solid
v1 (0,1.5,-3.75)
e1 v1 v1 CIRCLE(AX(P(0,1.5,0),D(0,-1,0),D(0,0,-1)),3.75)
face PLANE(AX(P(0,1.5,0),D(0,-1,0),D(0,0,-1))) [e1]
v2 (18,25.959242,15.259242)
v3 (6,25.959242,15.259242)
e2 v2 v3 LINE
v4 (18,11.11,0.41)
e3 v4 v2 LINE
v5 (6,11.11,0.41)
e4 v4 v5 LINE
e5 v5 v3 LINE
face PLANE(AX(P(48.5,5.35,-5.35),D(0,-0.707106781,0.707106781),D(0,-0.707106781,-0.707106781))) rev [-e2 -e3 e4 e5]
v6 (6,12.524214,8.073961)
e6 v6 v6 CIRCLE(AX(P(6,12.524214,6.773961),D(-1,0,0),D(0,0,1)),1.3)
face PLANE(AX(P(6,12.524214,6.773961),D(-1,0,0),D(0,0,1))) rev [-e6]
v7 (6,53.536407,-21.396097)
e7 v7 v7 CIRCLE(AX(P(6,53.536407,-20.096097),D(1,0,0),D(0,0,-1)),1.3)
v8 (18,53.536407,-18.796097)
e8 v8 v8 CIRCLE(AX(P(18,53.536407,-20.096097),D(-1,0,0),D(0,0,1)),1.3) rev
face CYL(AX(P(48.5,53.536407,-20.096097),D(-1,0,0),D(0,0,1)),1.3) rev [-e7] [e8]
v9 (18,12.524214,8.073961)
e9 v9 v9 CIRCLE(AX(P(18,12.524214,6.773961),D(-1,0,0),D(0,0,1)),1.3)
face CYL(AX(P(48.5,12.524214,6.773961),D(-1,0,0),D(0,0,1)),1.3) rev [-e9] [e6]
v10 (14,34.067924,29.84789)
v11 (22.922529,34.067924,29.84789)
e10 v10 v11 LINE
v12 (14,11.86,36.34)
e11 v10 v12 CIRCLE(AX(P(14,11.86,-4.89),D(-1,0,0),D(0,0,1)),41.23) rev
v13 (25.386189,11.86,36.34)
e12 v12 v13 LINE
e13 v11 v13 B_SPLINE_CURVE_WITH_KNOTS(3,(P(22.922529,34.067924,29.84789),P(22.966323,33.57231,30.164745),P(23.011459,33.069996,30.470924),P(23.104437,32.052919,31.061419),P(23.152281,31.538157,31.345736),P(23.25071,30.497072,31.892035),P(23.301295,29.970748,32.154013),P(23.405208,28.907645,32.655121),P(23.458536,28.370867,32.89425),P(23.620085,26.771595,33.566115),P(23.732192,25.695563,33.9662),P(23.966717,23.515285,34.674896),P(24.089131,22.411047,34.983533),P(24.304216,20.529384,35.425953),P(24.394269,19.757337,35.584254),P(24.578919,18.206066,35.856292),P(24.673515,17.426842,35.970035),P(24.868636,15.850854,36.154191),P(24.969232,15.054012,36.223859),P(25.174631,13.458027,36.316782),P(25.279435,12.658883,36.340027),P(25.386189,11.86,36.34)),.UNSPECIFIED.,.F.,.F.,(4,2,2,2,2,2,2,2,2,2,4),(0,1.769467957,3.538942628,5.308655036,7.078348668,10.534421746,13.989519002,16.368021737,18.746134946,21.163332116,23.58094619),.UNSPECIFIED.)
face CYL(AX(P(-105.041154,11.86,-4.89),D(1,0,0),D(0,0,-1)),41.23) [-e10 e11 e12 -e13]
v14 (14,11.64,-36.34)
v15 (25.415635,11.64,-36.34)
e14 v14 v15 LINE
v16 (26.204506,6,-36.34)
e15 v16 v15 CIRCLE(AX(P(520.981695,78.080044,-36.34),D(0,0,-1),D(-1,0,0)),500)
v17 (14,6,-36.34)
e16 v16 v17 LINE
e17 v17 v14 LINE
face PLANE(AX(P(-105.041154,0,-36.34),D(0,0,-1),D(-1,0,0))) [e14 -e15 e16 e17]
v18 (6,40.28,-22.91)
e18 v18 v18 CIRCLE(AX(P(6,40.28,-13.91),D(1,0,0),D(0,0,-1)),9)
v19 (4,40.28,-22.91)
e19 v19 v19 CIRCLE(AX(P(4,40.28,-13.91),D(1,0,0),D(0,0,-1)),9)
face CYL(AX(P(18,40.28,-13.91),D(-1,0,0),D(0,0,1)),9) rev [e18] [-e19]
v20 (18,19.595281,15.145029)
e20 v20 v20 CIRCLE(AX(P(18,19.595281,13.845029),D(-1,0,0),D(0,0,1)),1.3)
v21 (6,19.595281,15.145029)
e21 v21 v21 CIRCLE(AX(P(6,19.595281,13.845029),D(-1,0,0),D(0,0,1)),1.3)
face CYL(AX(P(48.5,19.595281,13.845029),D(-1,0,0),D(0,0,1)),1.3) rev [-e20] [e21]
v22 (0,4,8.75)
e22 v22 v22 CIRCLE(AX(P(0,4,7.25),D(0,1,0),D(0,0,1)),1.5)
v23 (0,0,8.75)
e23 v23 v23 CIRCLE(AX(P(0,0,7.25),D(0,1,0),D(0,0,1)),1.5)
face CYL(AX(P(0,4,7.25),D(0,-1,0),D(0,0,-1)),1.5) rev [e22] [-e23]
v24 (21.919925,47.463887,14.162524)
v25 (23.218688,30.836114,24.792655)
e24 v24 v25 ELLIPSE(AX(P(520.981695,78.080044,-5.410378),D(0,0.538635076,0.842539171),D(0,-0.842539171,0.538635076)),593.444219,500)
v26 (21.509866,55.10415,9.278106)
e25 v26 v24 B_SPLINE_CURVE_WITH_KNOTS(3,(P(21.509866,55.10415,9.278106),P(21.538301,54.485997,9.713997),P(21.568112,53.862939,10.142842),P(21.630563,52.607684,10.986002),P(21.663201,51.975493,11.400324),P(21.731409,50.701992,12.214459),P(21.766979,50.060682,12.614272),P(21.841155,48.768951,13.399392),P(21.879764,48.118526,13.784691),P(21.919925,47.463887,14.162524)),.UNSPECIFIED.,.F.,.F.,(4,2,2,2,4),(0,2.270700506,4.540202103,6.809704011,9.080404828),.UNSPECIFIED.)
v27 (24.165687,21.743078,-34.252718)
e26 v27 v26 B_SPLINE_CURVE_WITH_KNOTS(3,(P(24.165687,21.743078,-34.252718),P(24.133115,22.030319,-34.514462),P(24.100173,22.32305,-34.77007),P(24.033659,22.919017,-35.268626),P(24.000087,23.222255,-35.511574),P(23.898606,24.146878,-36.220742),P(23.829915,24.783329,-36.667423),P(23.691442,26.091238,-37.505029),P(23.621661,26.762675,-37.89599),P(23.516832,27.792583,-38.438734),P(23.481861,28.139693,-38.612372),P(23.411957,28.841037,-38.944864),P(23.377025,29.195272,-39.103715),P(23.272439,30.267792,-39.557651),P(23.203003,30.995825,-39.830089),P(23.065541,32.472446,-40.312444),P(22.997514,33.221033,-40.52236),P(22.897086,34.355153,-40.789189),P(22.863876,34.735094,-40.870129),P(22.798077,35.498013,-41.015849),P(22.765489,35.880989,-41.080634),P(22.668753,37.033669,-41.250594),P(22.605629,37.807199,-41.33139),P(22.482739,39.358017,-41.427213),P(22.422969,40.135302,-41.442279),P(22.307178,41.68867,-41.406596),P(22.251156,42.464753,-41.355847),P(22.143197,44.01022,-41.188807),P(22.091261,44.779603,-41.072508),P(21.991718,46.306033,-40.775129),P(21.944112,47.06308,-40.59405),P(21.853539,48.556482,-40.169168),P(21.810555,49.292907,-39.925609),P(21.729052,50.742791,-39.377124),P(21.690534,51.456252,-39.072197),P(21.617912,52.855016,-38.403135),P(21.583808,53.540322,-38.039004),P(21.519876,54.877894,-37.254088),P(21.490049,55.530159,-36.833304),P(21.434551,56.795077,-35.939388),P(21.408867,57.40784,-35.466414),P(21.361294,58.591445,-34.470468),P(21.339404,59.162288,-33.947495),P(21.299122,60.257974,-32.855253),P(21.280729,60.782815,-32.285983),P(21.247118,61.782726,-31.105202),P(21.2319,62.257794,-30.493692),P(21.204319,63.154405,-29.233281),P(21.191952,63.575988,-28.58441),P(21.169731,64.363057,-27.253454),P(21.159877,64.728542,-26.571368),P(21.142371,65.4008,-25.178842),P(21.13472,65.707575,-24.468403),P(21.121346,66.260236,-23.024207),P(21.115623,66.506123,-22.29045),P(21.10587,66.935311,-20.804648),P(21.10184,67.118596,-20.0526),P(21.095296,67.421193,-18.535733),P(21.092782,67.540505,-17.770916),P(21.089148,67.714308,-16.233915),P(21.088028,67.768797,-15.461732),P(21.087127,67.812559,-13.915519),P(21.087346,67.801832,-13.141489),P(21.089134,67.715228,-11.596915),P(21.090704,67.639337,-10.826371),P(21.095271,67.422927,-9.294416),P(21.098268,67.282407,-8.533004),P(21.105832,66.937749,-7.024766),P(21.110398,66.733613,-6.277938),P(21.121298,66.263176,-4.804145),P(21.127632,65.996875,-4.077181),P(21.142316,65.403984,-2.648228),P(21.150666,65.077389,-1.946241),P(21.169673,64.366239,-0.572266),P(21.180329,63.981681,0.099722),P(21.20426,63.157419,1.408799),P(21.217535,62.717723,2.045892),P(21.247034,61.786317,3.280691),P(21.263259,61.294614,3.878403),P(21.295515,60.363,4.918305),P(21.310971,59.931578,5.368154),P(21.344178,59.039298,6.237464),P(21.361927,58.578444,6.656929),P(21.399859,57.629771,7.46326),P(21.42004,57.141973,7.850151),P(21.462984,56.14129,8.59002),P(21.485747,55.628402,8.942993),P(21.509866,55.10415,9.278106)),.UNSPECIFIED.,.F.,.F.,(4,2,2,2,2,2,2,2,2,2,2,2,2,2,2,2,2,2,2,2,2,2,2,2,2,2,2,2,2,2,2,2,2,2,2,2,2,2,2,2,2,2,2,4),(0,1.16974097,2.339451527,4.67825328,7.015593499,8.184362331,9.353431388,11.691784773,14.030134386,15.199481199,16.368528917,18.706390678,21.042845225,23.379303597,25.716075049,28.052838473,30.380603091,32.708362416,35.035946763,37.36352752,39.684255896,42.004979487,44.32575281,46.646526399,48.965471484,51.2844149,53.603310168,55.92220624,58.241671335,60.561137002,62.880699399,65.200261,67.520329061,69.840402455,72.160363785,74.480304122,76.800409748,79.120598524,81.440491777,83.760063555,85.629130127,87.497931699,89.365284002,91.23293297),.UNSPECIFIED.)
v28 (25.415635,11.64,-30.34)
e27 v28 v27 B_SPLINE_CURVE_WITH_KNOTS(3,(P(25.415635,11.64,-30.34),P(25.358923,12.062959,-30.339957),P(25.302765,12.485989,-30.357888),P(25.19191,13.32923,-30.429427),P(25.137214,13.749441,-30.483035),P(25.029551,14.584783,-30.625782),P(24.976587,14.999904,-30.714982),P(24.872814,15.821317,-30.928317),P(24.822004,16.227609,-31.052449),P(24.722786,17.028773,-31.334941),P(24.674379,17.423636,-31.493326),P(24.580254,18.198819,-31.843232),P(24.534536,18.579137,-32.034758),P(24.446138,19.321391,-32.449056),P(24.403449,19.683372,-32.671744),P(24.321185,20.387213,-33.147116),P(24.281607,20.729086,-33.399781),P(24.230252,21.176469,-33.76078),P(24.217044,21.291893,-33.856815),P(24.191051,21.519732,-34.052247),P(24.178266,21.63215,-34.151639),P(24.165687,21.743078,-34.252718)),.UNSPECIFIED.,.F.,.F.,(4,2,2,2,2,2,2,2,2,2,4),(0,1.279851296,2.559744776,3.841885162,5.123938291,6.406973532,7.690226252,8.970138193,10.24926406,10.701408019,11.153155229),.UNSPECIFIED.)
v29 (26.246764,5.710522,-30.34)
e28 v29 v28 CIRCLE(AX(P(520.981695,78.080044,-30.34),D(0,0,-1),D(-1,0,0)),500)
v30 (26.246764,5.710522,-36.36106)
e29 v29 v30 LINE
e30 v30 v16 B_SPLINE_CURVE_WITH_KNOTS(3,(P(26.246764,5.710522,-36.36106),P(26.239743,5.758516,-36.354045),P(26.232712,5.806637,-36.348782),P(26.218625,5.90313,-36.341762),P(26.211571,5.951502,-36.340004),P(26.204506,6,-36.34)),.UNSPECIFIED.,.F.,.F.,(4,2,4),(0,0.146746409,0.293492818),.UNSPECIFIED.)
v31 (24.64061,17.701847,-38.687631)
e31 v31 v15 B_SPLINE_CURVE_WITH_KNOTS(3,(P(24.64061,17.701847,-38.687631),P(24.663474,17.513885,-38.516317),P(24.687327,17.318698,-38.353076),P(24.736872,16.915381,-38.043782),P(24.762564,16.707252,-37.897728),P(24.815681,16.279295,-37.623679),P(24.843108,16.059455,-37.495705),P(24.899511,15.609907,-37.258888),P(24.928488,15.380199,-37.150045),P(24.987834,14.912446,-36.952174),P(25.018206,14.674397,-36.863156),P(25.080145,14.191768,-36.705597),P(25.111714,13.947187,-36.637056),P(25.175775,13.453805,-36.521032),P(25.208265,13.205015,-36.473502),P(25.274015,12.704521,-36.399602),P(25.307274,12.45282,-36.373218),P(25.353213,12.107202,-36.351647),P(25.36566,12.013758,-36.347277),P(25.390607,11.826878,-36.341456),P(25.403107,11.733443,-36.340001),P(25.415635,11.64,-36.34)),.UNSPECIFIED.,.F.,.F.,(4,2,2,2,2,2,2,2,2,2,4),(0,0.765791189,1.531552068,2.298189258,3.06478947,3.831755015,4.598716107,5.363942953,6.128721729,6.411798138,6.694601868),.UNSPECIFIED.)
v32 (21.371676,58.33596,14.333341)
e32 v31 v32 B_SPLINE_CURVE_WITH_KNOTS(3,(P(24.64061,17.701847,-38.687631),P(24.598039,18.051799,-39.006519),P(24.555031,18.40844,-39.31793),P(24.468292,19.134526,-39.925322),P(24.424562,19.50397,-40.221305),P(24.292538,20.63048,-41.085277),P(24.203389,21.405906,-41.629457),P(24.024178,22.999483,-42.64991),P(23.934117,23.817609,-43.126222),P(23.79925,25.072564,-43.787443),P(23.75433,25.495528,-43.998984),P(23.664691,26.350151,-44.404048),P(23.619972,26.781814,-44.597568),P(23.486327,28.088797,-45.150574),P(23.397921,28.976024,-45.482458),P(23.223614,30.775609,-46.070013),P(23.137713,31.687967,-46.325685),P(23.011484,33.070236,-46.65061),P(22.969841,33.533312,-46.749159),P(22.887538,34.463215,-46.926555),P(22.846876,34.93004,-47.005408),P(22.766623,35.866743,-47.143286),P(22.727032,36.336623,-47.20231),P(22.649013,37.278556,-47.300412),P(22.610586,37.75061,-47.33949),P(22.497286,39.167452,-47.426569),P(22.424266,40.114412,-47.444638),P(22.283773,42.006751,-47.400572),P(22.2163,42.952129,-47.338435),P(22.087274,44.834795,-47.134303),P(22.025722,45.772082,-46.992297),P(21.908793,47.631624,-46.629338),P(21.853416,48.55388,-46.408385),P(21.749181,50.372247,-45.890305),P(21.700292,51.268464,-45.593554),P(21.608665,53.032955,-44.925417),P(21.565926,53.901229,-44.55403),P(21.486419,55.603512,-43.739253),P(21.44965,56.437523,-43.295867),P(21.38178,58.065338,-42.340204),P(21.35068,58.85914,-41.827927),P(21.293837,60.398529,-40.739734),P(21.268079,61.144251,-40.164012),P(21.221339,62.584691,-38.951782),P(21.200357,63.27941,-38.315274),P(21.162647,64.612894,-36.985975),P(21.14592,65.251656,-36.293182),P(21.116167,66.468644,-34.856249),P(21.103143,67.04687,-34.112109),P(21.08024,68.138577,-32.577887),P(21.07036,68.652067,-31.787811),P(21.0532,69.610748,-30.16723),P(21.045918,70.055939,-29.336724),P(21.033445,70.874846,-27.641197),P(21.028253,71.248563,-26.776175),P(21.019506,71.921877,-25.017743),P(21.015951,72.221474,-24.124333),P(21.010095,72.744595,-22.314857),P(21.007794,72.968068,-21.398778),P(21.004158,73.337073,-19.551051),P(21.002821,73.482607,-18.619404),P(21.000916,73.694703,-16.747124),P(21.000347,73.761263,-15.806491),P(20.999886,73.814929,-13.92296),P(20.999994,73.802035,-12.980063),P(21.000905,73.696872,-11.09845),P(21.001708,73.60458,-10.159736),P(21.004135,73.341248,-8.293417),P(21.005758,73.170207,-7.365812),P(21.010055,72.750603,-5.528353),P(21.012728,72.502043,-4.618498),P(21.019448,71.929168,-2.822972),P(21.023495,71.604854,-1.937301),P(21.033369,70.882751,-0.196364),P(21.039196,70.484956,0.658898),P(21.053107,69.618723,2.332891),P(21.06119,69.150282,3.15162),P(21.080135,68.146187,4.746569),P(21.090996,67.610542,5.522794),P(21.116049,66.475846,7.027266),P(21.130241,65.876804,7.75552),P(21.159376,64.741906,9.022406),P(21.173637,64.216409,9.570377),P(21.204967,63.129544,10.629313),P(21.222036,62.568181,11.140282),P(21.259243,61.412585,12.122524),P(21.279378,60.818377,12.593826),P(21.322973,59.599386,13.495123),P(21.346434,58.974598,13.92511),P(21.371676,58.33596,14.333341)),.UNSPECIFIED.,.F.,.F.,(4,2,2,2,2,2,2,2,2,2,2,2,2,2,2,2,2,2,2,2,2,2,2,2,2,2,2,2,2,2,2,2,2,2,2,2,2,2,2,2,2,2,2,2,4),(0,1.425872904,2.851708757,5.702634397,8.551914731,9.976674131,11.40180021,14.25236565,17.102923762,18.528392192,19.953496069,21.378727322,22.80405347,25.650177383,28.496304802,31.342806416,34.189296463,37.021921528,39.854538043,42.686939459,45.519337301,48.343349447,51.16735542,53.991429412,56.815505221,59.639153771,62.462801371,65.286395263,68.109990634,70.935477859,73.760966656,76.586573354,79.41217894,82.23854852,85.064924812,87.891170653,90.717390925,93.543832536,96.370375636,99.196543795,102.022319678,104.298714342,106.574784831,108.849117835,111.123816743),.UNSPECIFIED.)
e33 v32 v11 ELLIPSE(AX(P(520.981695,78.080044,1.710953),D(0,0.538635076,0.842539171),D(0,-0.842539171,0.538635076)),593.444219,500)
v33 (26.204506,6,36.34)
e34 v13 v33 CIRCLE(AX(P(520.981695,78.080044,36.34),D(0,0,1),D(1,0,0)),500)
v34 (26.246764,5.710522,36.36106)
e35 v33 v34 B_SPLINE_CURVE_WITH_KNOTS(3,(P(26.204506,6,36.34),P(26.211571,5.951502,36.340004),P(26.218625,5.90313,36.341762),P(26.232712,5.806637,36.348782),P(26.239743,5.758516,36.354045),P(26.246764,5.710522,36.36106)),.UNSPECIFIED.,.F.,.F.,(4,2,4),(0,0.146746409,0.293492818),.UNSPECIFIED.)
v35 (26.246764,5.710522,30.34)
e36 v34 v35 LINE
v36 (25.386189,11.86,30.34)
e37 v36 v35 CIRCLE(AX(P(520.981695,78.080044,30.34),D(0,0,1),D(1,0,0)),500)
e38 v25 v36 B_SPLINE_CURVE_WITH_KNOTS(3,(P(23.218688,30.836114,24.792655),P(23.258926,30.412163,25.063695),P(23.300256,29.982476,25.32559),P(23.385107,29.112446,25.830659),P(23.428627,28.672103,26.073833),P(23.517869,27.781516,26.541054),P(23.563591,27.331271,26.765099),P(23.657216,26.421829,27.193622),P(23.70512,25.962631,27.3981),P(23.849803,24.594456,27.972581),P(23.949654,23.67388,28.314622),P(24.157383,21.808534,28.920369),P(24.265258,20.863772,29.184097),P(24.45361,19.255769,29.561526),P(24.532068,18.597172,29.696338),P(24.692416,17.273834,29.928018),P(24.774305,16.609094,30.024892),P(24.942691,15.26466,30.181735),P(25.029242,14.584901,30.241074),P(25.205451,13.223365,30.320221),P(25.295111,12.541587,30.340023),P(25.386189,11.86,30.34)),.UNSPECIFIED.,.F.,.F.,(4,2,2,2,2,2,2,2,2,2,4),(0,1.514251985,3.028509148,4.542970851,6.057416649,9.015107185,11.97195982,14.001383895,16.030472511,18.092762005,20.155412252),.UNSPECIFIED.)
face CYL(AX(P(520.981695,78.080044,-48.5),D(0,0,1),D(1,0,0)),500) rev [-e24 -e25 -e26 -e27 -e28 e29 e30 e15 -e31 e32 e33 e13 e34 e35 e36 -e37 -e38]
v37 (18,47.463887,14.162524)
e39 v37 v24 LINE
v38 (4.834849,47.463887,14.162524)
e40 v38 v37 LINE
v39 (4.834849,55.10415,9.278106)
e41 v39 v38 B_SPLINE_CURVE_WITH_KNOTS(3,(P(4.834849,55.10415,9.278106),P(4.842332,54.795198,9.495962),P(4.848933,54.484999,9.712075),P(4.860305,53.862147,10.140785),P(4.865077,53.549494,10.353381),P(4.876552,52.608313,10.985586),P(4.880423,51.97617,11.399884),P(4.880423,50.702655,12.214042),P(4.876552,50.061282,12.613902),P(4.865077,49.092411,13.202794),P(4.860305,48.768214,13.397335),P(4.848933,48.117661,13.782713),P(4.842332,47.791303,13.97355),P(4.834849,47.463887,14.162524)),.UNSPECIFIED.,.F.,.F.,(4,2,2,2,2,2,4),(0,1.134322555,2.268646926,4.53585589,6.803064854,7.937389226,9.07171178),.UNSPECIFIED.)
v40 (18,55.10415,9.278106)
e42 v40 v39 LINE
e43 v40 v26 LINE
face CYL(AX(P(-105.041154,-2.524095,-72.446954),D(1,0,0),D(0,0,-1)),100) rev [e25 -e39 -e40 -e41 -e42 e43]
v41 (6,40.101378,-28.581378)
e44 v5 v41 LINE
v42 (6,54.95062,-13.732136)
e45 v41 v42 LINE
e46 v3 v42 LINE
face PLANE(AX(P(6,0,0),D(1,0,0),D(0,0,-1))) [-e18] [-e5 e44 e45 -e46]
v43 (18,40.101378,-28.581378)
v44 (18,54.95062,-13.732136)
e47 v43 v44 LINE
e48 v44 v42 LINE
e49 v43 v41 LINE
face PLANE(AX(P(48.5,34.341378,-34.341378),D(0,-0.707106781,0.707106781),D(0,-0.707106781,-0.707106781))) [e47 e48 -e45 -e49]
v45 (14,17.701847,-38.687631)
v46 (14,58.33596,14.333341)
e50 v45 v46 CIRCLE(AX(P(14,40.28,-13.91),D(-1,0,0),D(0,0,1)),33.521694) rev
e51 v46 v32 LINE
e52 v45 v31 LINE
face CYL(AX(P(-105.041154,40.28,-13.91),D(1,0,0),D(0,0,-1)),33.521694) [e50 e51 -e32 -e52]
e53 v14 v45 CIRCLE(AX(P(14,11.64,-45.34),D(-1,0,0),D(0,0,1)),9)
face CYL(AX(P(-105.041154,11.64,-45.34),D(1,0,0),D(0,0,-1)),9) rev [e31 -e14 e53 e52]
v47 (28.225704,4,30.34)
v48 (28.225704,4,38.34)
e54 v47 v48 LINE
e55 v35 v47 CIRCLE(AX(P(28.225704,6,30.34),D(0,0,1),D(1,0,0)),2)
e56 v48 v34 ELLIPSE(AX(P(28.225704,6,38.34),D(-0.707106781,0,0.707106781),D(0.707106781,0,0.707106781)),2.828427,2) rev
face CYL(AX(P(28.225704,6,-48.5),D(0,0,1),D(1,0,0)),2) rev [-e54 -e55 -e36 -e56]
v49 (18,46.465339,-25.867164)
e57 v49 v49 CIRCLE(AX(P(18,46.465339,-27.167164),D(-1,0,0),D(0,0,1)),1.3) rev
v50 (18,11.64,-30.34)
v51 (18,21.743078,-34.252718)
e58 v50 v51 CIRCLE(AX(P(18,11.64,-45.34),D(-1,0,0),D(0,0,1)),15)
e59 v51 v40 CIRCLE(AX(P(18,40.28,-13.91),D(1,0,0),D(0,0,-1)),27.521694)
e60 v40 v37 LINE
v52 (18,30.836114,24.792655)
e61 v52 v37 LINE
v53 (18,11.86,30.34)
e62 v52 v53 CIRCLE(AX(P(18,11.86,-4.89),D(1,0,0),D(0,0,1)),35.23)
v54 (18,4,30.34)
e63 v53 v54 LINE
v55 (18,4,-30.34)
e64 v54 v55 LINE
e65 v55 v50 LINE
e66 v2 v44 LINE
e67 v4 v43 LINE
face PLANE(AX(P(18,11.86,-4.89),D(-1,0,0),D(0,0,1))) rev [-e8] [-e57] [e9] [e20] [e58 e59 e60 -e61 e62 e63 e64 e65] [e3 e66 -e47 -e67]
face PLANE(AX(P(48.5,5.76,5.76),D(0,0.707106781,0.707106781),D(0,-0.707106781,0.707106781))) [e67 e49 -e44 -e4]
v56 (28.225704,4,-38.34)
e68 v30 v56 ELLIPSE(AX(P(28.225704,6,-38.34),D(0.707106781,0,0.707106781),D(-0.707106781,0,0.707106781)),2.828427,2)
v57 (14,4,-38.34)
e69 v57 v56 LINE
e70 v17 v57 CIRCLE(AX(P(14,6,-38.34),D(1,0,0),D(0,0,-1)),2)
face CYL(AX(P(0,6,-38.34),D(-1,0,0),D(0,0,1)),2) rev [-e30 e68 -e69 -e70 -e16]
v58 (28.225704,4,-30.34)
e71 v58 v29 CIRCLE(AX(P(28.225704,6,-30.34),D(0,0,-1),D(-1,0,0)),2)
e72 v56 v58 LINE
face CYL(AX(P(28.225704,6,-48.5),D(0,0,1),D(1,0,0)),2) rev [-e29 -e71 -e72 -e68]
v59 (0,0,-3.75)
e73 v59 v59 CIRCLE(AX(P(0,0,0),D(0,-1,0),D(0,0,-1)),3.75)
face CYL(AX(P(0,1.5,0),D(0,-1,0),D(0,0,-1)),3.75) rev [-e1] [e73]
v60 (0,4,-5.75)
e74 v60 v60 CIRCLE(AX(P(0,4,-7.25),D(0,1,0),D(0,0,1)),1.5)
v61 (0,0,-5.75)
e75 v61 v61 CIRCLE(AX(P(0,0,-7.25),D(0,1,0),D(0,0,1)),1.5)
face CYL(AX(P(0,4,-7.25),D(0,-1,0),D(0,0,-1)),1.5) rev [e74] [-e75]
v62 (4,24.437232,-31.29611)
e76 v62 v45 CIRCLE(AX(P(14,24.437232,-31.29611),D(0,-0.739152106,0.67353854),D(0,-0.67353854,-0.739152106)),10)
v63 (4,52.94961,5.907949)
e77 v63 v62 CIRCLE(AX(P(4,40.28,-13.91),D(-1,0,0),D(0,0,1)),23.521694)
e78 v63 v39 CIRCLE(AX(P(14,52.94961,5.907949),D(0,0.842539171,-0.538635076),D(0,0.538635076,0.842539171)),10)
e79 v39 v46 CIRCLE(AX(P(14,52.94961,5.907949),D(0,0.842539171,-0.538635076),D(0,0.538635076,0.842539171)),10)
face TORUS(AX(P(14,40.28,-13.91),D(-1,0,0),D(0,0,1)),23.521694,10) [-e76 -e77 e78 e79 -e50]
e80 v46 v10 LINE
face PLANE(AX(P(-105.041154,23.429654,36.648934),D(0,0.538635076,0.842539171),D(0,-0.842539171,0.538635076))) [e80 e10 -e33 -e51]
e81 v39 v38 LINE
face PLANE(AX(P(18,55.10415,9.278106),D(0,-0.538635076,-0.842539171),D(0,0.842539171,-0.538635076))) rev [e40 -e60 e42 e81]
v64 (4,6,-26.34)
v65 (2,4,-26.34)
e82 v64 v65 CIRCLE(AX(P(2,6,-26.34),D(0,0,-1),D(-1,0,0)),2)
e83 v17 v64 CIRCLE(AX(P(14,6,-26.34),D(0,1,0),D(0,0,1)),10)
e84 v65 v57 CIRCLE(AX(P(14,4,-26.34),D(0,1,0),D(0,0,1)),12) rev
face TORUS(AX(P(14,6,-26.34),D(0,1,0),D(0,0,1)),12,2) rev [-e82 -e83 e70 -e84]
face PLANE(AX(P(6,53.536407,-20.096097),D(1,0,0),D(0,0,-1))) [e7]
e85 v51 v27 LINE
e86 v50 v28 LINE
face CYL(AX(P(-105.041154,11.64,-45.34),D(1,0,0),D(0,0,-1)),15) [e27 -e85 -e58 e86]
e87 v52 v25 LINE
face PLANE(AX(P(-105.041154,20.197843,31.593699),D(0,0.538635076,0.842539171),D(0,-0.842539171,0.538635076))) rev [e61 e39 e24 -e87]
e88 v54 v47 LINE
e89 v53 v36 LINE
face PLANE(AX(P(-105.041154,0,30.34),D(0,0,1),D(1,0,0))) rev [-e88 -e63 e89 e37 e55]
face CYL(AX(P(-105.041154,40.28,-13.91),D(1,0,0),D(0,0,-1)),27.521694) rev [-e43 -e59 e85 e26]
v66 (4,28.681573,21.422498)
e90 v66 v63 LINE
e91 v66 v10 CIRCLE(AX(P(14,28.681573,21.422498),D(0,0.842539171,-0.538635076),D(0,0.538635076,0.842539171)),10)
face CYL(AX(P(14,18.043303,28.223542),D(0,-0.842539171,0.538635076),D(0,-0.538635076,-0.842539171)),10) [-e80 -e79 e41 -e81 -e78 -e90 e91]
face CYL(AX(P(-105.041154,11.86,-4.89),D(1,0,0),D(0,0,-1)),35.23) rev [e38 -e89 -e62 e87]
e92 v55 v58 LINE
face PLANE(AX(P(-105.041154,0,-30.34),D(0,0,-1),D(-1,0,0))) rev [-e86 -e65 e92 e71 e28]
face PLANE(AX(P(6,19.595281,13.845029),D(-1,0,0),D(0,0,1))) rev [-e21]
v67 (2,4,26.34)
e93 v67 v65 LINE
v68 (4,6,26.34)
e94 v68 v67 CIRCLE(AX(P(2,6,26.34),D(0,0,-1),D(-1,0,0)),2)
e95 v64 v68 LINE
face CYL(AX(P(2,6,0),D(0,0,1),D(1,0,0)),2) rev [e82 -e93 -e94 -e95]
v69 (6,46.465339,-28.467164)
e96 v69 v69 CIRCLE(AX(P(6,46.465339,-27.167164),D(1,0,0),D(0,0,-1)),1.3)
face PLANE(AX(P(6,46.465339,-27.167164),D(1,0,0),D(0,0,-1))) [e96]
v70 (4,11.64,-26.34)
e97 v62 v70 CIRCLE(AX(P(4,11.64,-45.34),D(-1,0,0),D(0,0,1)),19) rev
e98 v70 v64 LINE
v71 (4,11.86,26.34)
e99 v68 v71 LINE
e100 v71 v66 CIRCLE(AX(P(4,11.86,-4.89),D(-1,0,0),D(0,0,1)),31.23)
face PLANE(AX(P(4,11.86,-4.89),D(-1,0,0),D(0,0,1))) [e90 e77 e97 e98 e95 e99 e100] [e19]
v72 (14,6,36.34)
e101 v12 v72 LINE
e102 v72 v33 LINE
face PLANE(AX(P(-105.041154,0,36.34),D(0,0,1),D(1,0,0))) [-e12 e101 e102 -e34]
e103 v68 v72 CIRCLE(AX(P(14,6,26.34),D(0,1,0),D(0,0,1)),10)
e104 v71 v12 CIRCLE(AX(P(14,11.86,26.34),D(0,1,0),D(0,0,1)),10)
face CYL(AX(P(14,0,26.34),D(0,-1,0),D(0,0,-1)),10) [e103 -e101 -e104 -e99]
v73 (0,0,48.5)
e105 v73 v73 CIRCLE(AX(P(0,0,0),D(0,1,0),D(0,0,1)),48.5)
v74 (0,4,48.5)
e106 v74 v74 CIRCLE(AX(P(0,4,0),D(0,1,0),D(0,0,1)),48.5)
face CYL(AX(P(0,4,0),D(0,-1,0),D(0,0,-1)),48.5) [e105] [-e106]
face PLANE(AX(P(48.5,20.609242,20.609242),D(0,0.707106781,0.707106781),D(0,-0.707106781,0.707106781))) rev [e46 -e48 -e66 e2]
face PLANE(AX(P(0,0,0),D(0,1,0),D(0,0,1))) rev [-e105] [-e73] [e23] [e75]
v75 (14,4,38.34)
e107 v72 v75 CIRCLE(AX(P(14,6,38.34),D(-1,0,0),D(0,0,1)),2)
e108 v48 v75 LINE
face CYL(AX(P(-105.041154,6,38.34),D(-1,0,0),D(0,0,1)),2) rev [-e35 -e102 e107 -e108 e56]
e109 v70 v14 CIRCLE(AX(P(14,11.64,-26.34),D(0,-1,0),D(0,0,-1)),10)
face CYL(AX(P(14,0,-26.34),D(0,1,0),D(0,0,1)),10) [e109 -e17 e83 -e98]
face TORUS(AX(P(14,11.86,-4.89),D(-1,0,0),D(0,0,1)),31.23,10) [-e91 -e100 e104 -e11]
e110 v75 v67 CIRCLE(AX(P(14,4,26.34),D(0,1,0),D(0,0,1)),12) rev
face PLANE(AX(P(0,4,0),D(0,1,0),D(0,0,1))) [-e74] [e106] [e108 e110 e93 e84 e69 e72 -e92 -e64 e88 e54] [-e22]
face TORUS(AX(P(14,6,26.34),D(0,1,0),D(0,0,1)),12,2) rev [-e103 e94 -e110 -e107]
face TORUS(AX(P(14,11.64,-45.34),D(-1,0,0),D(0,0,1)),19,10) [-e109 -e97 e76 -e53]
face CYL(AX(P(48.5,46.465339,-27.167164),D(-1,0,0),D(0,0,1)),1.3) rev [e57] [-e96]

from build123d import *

# Parameters (mm, degrees)
SKETCH1_R                       = 48.5
SKETCH1_R_2                     = 1.5
BOSS_EXTRUDE1_DEPTH             = 4
SKETCH2_R                       = 3.75
CUT_EXTRUDE1_DEPTH              = 1.5
BOSS_EXTRUDE2_START             = 4
SKETCH3_R                       = 9
BOSS_EXTRUDE2_DEPTH             = 14
CUT_EXTRUDE3_START              = 6
SKETCH4_R                       = 1.3
CUT_EXTRUDE3_DEPTH              = 91.444646155
BOSS_EXTRUDE3_DEPTH             = 9
BOSS_EXTRUDE3_DIRECTION_2_REACH = 108.638
CUT_EXTRUDE4_DEPTH              = 101.75311462
CUT_EXTRUDE4_DEPTH_BACK         = 101.75311462
FILLET1_R                       = 10
FILLET2_R                       = 2


with BuildPart() as part:
    # Sketch1 → Boss-Extrude1 (new body)
    with BuildSketch(Plane(origin=(0, 0, 0), x_dir=(1, 0, 0), z_dir=(0, 1, 0))):
        with Locations(Location((0, 0, 0), (0, 0, 270))):
            Circle(SKETCH1_R)
        with Locations(Location((0, 7.25, 0), (0, 0, 270))):
            Circle(SKETCH1_R_2, mode=Mode.SUBTRACT)
        with Locations(Location((0, -7.25, 0), (0, 0, 270))):
            Circle(SKETCH1_R_2, mode=Mode.SUBTRACT)
    extrude(amount=BOSS_EXTRUDE1_DEPTH)

    # Sketch2 → Cut-Extrude1 (cut)
    with BuildSketch(Plane.XZ):
        with Locations(Location((0, 0, 0), (0, 0, 270))):
            Circle(SKETCH2_R)
    extrude(amount=-CUT_EXTRUDE1_DEPTH, mode=Mode.SUBTRACT)

    # Sketch3 → Boss-Extrude2 (add)
    with BuildSketch(Plane(origin=(0, 0, 0), x_dir=(0, 0, -1), z_dir=(1, 0, 0)).offset(BOSS_EXTRUDE2_START)):
        with BuildLine():
            Line((30.34, 4), (-30.34, 4))
            Line((-30.34, 4), (-30.34, 11.86))
            ThreePointArc((-30.34, 11.86), (-28.924736696, 21.745164753), (-24.792654999, 30.836113728))
            Line((-24.792654999, 30.836113728), (-9.278105641, 55.104149989))
            ThreePointArc((-9.278105641, 55.104149989), (30.651097233, 62.12443475), (34.252718415, 21.743078098))
            ThreePointArc((34.252718415, 21.743078098), (31.352340729, 17.057138369), (30.34, 11.64))
            Line((30.34, 11.64), (30.34, 4))
        make_face()
        with Locations((13.91, 40.28)):
            Circle(SKETCH3_R, mode=Mode.SUBTRACT)
    extrude(amount=BOSS_EXTRUDE2_DEPTH)

    # Sketch4 → Cut-Extrude3 (cut, through all)
    with BuildSketch(Plane(origin=(0, 0, 0), x_dir=(0, 0, -1), z_dir=(1, 0, 0)).offset(CUT_EXTRUDE3_START)):
        Polygon((-15.259242405, 25.959242405), (13.732135624, 54.950620434), (28.581378029, 40.101378029), (-0.41, 11.11), align=None)
        with Locations(Location((-13.845028843, 19.595281374, 0), (0, 0, 180))):
            Circle(SKETCH4_R)
        with Locations(Location((-6.773961031, 12.524213562, 0), (0, 0, 180))):
            Circle(SKETCH4_R)
        with Locations(Location((20.096096654, 53.536406871, 0), (0, 0, 180))):
            Circle(SKETCH4_R)
        with Locations(Location((27.167164466, 46.465339059, 0), (0, 0, 180))):
            Circle(SKETCH4_R)
    extrude(amount=CUT_EXTRUDE3_DEPTH, mode=Mode.SUBTRACT)

    # Sketch5 → Boss-Extrude3 (add)
    with BuildSketch(Plane(origin=(18, 0, 0), x_dir=(0, 0, -1), z_dir=(1, 0, 0))):
        with BuildLine():
            Line((30.34, 4), (36.34, 4))
            Line((36.34, 4), (36.34, 11.64))
            ThreePointArc((36.34, 11.64), (36.947404437, 14.890283021), (38.687631049, 17.701846859))
            ThreePointArc((38.687631049, 17.701846859), (34.300821036, 66.886736311), (-14.333340667, 58.335960445))
            Line((-14.333340667, 58.335960445), (-29.847890025, 34.067924184))
            ThreePointArc((-29.847890025, 34.067924184), (-34.683704058, 23.428701186), (-36.34, 11.86))
            Line((-36.34, 11.86), (-36.34, 4))
            Line((-36.34, 4), (-30.34, 4))
            Line((-30.34, 4), (-30.34, 11.86))
            ThreePointArc((-30.34, 11.86), (-28.924736696, 21.745164753), (-24.792654999, 30.836113728))
            Line((-24.792654999, 30.836113728), (-14.162524076, 47.463886585))
            ThreePointArc((-14.162524076, 47.463886585), (-11.806963139, 51.339412511), (-9.278105641, 55.104149989))
            ThreePointArc((-9.278105641, 55.104149989), (30.651097233, 62.12443475), (34.252718415, 21.743078098))
            ThreePointArc((34.252718415, 21.743078098), (31.352340729, 17.057138369), (30.34, 11.64))
            Line((30.34, 11.64), (30.34, 4))
        make_face()
    extrude(amount=BOSS_EXTRUDE3_DEPTH)

    # Boss-Extrude3 direction 2: up to this face of the body (flat: up to its plane)
    boss_extrude3_direction_2_end = Plane(part.part.faces().sort_by_distance((4, 32.000889593, -6.762869766))[0])
    # Sketch5 → Boss-Extrude3 direction 2 (add, up to the picked face)
    with BuildSketch(Plane(origin=(18, 0, 0), x_dir=(0, 0, -1), z_dir=(1, 0, 0)), mode=Mode.PRIVATE) as boss_extrude3_direction_2_sk1:
        with BuildLine():
            Line((30.34, 4), (36.34, 4))
            Line((36.34, 4), (36.34, 11.64))
            ThreePointArc((36.34, 11.64), (36.947404437, 14.890283021), (38.687631049, 17.701846859))
            ThreePointArc((38.687631049, 17.701846859), (34.300821036, 66.886736311), (-14.333340667, 58.335960445))
            Line((-14.333340667, 58.335960445), (-29.847890025, 34.067924184))
            ThreePointArc((-29.847890025, 34.067924184), (-34.683704058, 23.428701186), (-36.34, 11.86))
            Line((-36.34, 11.86), (-36.34, 4))
            Line((-36.34, 4), (-30.34, 4))
            Line((-30.34, 4), (-30.34, 11.86))
            ThreePointArc((-30.34, 11.86), (-28.924736696, 21.745164753), (-24.792654999, 30.836113728))
            Line((-24.792654999, 30.836113728), (-14.162524076, 47.463886585))
            ThreePointArc((-14.162524076, 47.463886585), (-11.806963139, 51.339412511), (-9.278105641, 55.104149989))
            ThreePointArc((-9.278105641, 55.104149989), (30.651097233, 62.12443475), (34.252718415, 21.743078098))
            ThreePointArc((34.252718415, 21.743078098), (31.352340729, 17.057138369), (30.34, 11.64))
            Line((30.34, 11.64), (30.34, 4))
        make_face()
    boss_extrude3_direction_2_tool1 = split(extrude(boss_extrude3_direction_2_sk1.sketch, amount=-BOSS_EXTRUDE3_DIRECTION_2_REACH, mode=Mode.PRIVATE), bisect_by=boss_extrude3_direction_2_end, keep=Keep.BOTH, mode=Mode.PRIVATE)
    add(boss_extrude3_direction_2_tool1.solids().sort_by(Axis((18, 7.82, -31.430412), (-1, 0, 0)))[0])

    # Sketch6 → Cut-Extrude4 (cut, two sides: drawn at the far end of the back side and taken through both)
    with BuildSketch(Plane.XY.offset(-CUT_EXTRUDE4_DEPTH_BACK)):
        with BuildLine():
            Line((27, 73.801694463), (21, 73.801694463))
            ThreePointArc((21, 73.801694463), (22.52665425, 38.804454133), (26.5, 4))
            Line((26.5, 4), (27, 4))
            Line((27, 4), (27, 73.801694463))
        make_face()
    extrude(amount=CUT_EXTRUDE4_DEPTH + CUT_EXTRUDE4_DEPTH_BACK, mode=Mode.SUBTRACT)

    # Fillet1
    # the kernel refuses this fillet: 10 mm, written as the material it takes off along each edge
    with BuildSketch(Plane(origin=(4, 11.86, 36.34), x_dir=(0, 0, -1), z_dir=(0, -1, 0))) as fillet1_piece_1:
        with BuildLine():
            CenterArc((FILLET1_R, FILLET1_R), FILLET1_R, 180, 90)
            Line((0, FILLET1_R), (0, 0))
            Line((0, 0), (FILLET1_R, 0))
        make_face()
    extrude(amount=7.86, mode=Mode.SUBTRACT)
    with BuildSketch(Plane(origin=(4, 11.86, -4.89), x_dir=(0, 0.5386350760234976, 0.8425391711233141), z_dir=(0, 0.8425391711233141, -0.5386350760234976))) as fillet1_piece_2:
        with BuildLine():
            CenterArc((41.23 - FILLET1_R, FILLET1_R), FILLET1_R, 270, 90)
            Line((41.23, FILLET1_R), (41.23, 0))
            Line((41.23, 0), (41.23 - FILLET1_R, 0))
        make_face()
    revolve(axis=Axis((4, 11.86, -4.89), (1, 0, 0)), revolution_arc=32.590770812, mode=Mode.SUBTRACT)
    with BuildSketch(Plane(origin=(4, 58.335960445, 14.333340667), x_dir=(0, -0.5386350760234987, -0.8425391711233132), z_dir=(0, -0.8425391711233133, 0.5386350760234988))) as fillet1_piece_3:
        with BuildLine():
            CenterArc((FILLET1_R, FILLET1_R), FILLET1_R, 180, 90)
            Line((0, FILLET1_R), (0, 0))
            Line((0, 0), (FILLET1_R, 0))
        make_face()
    extrude(amount=28.803451629, mode=Mode.SUBTRACT)
    with BuildSketch(Plane(origin=(4, 40.28, -13.91), x_dir=(0, -0.6735385398377844, -0.7391521056948869), z_dir=(0, -0.7391521056948869, 0.6735385398377844))) as fillet1_piece_4:
        with BuildLine():
            CenterArc((33.521694463 - FILLET1_R, FILLET1_R), FILLET1_R, 270, 90)
            Line((33.521694463, FILLET1_R), (33.521694463, 0))
            Line((33.521694463, 0), (33.521694463 - FILLET1_R, 0))
        make_face()
    revolve(axis=Axis((4, 40.28, -13.91), (1, 0, 0)), revolution_arc=189.749991197, mode=Mode.SUBTRACT)
    with BuildSketch(Plane(origin=(4, 4, -36.34), x_dir=(0, 0, 1), z_dir=(0, 1, 0))) as fillet1_piece_5:
        with BuildLine():
            CenterArc((FILLET1_R, FILLET1_R), FILLET1_R, 180, 90)
            Line((0, FILLET1_R), (0, 0))
            Line((0, 0), (FILLET1_R, 0))
        make_face()
    extrude(amount=7.64, mode=Mode.SUBTRACT)
    with BuildSketch(Plane(origin=(4, 11.64, -45.34), x_dir=(0, 0.6735385398377856, 0.7391521056948859), z_dir=(0, 0.7391521056948859, -0.6735385398377856))) as fillet1_piece_6:
        with BuildLine():
            CenterArc((9 + FILLET1_R, FILLET1_R), FILLET1_R, 180, 90)
            Line((9, FILLET1_R), (9, 0))
            Line((9, 0), (9 + FILLET1_R, 0))
        make_face()
    revolve(axis=Axis((4, 11.64, -45.34), (1, 0, 0)), revolution_arc=42.340762009, mode=Mode.SUBTRACT)

    # Fillet2
    fillet2_edges = [part.edges().sort_by_distance(p)[0] for p in [
        (20.25, 4, -36.34),
        (20.25, 4, 36.34),
        (6.928932188, 4, 33.411067812),
        (4, 4, 0),
        (6.928932188, 4, -33.411067812),
    ]]
    fillet(fillet2_edges, radius=FILLET2_R)
    fillet2_2_edges = [part.edges().sort_by_distance(p)[0] for p in [
        (26.5, 4, -33.34),
    ]]
    fillet(fillet2_2_edges, radius=FILLET2_R)
    fillet2_3_edges = [part.edges().sort_by_distance(p)[0] for p in [
        (26.5, 4, 33.34),
    ]]
    fillet(fillet2_3_edges, radius=FILLET2_R)


solid = part.part
